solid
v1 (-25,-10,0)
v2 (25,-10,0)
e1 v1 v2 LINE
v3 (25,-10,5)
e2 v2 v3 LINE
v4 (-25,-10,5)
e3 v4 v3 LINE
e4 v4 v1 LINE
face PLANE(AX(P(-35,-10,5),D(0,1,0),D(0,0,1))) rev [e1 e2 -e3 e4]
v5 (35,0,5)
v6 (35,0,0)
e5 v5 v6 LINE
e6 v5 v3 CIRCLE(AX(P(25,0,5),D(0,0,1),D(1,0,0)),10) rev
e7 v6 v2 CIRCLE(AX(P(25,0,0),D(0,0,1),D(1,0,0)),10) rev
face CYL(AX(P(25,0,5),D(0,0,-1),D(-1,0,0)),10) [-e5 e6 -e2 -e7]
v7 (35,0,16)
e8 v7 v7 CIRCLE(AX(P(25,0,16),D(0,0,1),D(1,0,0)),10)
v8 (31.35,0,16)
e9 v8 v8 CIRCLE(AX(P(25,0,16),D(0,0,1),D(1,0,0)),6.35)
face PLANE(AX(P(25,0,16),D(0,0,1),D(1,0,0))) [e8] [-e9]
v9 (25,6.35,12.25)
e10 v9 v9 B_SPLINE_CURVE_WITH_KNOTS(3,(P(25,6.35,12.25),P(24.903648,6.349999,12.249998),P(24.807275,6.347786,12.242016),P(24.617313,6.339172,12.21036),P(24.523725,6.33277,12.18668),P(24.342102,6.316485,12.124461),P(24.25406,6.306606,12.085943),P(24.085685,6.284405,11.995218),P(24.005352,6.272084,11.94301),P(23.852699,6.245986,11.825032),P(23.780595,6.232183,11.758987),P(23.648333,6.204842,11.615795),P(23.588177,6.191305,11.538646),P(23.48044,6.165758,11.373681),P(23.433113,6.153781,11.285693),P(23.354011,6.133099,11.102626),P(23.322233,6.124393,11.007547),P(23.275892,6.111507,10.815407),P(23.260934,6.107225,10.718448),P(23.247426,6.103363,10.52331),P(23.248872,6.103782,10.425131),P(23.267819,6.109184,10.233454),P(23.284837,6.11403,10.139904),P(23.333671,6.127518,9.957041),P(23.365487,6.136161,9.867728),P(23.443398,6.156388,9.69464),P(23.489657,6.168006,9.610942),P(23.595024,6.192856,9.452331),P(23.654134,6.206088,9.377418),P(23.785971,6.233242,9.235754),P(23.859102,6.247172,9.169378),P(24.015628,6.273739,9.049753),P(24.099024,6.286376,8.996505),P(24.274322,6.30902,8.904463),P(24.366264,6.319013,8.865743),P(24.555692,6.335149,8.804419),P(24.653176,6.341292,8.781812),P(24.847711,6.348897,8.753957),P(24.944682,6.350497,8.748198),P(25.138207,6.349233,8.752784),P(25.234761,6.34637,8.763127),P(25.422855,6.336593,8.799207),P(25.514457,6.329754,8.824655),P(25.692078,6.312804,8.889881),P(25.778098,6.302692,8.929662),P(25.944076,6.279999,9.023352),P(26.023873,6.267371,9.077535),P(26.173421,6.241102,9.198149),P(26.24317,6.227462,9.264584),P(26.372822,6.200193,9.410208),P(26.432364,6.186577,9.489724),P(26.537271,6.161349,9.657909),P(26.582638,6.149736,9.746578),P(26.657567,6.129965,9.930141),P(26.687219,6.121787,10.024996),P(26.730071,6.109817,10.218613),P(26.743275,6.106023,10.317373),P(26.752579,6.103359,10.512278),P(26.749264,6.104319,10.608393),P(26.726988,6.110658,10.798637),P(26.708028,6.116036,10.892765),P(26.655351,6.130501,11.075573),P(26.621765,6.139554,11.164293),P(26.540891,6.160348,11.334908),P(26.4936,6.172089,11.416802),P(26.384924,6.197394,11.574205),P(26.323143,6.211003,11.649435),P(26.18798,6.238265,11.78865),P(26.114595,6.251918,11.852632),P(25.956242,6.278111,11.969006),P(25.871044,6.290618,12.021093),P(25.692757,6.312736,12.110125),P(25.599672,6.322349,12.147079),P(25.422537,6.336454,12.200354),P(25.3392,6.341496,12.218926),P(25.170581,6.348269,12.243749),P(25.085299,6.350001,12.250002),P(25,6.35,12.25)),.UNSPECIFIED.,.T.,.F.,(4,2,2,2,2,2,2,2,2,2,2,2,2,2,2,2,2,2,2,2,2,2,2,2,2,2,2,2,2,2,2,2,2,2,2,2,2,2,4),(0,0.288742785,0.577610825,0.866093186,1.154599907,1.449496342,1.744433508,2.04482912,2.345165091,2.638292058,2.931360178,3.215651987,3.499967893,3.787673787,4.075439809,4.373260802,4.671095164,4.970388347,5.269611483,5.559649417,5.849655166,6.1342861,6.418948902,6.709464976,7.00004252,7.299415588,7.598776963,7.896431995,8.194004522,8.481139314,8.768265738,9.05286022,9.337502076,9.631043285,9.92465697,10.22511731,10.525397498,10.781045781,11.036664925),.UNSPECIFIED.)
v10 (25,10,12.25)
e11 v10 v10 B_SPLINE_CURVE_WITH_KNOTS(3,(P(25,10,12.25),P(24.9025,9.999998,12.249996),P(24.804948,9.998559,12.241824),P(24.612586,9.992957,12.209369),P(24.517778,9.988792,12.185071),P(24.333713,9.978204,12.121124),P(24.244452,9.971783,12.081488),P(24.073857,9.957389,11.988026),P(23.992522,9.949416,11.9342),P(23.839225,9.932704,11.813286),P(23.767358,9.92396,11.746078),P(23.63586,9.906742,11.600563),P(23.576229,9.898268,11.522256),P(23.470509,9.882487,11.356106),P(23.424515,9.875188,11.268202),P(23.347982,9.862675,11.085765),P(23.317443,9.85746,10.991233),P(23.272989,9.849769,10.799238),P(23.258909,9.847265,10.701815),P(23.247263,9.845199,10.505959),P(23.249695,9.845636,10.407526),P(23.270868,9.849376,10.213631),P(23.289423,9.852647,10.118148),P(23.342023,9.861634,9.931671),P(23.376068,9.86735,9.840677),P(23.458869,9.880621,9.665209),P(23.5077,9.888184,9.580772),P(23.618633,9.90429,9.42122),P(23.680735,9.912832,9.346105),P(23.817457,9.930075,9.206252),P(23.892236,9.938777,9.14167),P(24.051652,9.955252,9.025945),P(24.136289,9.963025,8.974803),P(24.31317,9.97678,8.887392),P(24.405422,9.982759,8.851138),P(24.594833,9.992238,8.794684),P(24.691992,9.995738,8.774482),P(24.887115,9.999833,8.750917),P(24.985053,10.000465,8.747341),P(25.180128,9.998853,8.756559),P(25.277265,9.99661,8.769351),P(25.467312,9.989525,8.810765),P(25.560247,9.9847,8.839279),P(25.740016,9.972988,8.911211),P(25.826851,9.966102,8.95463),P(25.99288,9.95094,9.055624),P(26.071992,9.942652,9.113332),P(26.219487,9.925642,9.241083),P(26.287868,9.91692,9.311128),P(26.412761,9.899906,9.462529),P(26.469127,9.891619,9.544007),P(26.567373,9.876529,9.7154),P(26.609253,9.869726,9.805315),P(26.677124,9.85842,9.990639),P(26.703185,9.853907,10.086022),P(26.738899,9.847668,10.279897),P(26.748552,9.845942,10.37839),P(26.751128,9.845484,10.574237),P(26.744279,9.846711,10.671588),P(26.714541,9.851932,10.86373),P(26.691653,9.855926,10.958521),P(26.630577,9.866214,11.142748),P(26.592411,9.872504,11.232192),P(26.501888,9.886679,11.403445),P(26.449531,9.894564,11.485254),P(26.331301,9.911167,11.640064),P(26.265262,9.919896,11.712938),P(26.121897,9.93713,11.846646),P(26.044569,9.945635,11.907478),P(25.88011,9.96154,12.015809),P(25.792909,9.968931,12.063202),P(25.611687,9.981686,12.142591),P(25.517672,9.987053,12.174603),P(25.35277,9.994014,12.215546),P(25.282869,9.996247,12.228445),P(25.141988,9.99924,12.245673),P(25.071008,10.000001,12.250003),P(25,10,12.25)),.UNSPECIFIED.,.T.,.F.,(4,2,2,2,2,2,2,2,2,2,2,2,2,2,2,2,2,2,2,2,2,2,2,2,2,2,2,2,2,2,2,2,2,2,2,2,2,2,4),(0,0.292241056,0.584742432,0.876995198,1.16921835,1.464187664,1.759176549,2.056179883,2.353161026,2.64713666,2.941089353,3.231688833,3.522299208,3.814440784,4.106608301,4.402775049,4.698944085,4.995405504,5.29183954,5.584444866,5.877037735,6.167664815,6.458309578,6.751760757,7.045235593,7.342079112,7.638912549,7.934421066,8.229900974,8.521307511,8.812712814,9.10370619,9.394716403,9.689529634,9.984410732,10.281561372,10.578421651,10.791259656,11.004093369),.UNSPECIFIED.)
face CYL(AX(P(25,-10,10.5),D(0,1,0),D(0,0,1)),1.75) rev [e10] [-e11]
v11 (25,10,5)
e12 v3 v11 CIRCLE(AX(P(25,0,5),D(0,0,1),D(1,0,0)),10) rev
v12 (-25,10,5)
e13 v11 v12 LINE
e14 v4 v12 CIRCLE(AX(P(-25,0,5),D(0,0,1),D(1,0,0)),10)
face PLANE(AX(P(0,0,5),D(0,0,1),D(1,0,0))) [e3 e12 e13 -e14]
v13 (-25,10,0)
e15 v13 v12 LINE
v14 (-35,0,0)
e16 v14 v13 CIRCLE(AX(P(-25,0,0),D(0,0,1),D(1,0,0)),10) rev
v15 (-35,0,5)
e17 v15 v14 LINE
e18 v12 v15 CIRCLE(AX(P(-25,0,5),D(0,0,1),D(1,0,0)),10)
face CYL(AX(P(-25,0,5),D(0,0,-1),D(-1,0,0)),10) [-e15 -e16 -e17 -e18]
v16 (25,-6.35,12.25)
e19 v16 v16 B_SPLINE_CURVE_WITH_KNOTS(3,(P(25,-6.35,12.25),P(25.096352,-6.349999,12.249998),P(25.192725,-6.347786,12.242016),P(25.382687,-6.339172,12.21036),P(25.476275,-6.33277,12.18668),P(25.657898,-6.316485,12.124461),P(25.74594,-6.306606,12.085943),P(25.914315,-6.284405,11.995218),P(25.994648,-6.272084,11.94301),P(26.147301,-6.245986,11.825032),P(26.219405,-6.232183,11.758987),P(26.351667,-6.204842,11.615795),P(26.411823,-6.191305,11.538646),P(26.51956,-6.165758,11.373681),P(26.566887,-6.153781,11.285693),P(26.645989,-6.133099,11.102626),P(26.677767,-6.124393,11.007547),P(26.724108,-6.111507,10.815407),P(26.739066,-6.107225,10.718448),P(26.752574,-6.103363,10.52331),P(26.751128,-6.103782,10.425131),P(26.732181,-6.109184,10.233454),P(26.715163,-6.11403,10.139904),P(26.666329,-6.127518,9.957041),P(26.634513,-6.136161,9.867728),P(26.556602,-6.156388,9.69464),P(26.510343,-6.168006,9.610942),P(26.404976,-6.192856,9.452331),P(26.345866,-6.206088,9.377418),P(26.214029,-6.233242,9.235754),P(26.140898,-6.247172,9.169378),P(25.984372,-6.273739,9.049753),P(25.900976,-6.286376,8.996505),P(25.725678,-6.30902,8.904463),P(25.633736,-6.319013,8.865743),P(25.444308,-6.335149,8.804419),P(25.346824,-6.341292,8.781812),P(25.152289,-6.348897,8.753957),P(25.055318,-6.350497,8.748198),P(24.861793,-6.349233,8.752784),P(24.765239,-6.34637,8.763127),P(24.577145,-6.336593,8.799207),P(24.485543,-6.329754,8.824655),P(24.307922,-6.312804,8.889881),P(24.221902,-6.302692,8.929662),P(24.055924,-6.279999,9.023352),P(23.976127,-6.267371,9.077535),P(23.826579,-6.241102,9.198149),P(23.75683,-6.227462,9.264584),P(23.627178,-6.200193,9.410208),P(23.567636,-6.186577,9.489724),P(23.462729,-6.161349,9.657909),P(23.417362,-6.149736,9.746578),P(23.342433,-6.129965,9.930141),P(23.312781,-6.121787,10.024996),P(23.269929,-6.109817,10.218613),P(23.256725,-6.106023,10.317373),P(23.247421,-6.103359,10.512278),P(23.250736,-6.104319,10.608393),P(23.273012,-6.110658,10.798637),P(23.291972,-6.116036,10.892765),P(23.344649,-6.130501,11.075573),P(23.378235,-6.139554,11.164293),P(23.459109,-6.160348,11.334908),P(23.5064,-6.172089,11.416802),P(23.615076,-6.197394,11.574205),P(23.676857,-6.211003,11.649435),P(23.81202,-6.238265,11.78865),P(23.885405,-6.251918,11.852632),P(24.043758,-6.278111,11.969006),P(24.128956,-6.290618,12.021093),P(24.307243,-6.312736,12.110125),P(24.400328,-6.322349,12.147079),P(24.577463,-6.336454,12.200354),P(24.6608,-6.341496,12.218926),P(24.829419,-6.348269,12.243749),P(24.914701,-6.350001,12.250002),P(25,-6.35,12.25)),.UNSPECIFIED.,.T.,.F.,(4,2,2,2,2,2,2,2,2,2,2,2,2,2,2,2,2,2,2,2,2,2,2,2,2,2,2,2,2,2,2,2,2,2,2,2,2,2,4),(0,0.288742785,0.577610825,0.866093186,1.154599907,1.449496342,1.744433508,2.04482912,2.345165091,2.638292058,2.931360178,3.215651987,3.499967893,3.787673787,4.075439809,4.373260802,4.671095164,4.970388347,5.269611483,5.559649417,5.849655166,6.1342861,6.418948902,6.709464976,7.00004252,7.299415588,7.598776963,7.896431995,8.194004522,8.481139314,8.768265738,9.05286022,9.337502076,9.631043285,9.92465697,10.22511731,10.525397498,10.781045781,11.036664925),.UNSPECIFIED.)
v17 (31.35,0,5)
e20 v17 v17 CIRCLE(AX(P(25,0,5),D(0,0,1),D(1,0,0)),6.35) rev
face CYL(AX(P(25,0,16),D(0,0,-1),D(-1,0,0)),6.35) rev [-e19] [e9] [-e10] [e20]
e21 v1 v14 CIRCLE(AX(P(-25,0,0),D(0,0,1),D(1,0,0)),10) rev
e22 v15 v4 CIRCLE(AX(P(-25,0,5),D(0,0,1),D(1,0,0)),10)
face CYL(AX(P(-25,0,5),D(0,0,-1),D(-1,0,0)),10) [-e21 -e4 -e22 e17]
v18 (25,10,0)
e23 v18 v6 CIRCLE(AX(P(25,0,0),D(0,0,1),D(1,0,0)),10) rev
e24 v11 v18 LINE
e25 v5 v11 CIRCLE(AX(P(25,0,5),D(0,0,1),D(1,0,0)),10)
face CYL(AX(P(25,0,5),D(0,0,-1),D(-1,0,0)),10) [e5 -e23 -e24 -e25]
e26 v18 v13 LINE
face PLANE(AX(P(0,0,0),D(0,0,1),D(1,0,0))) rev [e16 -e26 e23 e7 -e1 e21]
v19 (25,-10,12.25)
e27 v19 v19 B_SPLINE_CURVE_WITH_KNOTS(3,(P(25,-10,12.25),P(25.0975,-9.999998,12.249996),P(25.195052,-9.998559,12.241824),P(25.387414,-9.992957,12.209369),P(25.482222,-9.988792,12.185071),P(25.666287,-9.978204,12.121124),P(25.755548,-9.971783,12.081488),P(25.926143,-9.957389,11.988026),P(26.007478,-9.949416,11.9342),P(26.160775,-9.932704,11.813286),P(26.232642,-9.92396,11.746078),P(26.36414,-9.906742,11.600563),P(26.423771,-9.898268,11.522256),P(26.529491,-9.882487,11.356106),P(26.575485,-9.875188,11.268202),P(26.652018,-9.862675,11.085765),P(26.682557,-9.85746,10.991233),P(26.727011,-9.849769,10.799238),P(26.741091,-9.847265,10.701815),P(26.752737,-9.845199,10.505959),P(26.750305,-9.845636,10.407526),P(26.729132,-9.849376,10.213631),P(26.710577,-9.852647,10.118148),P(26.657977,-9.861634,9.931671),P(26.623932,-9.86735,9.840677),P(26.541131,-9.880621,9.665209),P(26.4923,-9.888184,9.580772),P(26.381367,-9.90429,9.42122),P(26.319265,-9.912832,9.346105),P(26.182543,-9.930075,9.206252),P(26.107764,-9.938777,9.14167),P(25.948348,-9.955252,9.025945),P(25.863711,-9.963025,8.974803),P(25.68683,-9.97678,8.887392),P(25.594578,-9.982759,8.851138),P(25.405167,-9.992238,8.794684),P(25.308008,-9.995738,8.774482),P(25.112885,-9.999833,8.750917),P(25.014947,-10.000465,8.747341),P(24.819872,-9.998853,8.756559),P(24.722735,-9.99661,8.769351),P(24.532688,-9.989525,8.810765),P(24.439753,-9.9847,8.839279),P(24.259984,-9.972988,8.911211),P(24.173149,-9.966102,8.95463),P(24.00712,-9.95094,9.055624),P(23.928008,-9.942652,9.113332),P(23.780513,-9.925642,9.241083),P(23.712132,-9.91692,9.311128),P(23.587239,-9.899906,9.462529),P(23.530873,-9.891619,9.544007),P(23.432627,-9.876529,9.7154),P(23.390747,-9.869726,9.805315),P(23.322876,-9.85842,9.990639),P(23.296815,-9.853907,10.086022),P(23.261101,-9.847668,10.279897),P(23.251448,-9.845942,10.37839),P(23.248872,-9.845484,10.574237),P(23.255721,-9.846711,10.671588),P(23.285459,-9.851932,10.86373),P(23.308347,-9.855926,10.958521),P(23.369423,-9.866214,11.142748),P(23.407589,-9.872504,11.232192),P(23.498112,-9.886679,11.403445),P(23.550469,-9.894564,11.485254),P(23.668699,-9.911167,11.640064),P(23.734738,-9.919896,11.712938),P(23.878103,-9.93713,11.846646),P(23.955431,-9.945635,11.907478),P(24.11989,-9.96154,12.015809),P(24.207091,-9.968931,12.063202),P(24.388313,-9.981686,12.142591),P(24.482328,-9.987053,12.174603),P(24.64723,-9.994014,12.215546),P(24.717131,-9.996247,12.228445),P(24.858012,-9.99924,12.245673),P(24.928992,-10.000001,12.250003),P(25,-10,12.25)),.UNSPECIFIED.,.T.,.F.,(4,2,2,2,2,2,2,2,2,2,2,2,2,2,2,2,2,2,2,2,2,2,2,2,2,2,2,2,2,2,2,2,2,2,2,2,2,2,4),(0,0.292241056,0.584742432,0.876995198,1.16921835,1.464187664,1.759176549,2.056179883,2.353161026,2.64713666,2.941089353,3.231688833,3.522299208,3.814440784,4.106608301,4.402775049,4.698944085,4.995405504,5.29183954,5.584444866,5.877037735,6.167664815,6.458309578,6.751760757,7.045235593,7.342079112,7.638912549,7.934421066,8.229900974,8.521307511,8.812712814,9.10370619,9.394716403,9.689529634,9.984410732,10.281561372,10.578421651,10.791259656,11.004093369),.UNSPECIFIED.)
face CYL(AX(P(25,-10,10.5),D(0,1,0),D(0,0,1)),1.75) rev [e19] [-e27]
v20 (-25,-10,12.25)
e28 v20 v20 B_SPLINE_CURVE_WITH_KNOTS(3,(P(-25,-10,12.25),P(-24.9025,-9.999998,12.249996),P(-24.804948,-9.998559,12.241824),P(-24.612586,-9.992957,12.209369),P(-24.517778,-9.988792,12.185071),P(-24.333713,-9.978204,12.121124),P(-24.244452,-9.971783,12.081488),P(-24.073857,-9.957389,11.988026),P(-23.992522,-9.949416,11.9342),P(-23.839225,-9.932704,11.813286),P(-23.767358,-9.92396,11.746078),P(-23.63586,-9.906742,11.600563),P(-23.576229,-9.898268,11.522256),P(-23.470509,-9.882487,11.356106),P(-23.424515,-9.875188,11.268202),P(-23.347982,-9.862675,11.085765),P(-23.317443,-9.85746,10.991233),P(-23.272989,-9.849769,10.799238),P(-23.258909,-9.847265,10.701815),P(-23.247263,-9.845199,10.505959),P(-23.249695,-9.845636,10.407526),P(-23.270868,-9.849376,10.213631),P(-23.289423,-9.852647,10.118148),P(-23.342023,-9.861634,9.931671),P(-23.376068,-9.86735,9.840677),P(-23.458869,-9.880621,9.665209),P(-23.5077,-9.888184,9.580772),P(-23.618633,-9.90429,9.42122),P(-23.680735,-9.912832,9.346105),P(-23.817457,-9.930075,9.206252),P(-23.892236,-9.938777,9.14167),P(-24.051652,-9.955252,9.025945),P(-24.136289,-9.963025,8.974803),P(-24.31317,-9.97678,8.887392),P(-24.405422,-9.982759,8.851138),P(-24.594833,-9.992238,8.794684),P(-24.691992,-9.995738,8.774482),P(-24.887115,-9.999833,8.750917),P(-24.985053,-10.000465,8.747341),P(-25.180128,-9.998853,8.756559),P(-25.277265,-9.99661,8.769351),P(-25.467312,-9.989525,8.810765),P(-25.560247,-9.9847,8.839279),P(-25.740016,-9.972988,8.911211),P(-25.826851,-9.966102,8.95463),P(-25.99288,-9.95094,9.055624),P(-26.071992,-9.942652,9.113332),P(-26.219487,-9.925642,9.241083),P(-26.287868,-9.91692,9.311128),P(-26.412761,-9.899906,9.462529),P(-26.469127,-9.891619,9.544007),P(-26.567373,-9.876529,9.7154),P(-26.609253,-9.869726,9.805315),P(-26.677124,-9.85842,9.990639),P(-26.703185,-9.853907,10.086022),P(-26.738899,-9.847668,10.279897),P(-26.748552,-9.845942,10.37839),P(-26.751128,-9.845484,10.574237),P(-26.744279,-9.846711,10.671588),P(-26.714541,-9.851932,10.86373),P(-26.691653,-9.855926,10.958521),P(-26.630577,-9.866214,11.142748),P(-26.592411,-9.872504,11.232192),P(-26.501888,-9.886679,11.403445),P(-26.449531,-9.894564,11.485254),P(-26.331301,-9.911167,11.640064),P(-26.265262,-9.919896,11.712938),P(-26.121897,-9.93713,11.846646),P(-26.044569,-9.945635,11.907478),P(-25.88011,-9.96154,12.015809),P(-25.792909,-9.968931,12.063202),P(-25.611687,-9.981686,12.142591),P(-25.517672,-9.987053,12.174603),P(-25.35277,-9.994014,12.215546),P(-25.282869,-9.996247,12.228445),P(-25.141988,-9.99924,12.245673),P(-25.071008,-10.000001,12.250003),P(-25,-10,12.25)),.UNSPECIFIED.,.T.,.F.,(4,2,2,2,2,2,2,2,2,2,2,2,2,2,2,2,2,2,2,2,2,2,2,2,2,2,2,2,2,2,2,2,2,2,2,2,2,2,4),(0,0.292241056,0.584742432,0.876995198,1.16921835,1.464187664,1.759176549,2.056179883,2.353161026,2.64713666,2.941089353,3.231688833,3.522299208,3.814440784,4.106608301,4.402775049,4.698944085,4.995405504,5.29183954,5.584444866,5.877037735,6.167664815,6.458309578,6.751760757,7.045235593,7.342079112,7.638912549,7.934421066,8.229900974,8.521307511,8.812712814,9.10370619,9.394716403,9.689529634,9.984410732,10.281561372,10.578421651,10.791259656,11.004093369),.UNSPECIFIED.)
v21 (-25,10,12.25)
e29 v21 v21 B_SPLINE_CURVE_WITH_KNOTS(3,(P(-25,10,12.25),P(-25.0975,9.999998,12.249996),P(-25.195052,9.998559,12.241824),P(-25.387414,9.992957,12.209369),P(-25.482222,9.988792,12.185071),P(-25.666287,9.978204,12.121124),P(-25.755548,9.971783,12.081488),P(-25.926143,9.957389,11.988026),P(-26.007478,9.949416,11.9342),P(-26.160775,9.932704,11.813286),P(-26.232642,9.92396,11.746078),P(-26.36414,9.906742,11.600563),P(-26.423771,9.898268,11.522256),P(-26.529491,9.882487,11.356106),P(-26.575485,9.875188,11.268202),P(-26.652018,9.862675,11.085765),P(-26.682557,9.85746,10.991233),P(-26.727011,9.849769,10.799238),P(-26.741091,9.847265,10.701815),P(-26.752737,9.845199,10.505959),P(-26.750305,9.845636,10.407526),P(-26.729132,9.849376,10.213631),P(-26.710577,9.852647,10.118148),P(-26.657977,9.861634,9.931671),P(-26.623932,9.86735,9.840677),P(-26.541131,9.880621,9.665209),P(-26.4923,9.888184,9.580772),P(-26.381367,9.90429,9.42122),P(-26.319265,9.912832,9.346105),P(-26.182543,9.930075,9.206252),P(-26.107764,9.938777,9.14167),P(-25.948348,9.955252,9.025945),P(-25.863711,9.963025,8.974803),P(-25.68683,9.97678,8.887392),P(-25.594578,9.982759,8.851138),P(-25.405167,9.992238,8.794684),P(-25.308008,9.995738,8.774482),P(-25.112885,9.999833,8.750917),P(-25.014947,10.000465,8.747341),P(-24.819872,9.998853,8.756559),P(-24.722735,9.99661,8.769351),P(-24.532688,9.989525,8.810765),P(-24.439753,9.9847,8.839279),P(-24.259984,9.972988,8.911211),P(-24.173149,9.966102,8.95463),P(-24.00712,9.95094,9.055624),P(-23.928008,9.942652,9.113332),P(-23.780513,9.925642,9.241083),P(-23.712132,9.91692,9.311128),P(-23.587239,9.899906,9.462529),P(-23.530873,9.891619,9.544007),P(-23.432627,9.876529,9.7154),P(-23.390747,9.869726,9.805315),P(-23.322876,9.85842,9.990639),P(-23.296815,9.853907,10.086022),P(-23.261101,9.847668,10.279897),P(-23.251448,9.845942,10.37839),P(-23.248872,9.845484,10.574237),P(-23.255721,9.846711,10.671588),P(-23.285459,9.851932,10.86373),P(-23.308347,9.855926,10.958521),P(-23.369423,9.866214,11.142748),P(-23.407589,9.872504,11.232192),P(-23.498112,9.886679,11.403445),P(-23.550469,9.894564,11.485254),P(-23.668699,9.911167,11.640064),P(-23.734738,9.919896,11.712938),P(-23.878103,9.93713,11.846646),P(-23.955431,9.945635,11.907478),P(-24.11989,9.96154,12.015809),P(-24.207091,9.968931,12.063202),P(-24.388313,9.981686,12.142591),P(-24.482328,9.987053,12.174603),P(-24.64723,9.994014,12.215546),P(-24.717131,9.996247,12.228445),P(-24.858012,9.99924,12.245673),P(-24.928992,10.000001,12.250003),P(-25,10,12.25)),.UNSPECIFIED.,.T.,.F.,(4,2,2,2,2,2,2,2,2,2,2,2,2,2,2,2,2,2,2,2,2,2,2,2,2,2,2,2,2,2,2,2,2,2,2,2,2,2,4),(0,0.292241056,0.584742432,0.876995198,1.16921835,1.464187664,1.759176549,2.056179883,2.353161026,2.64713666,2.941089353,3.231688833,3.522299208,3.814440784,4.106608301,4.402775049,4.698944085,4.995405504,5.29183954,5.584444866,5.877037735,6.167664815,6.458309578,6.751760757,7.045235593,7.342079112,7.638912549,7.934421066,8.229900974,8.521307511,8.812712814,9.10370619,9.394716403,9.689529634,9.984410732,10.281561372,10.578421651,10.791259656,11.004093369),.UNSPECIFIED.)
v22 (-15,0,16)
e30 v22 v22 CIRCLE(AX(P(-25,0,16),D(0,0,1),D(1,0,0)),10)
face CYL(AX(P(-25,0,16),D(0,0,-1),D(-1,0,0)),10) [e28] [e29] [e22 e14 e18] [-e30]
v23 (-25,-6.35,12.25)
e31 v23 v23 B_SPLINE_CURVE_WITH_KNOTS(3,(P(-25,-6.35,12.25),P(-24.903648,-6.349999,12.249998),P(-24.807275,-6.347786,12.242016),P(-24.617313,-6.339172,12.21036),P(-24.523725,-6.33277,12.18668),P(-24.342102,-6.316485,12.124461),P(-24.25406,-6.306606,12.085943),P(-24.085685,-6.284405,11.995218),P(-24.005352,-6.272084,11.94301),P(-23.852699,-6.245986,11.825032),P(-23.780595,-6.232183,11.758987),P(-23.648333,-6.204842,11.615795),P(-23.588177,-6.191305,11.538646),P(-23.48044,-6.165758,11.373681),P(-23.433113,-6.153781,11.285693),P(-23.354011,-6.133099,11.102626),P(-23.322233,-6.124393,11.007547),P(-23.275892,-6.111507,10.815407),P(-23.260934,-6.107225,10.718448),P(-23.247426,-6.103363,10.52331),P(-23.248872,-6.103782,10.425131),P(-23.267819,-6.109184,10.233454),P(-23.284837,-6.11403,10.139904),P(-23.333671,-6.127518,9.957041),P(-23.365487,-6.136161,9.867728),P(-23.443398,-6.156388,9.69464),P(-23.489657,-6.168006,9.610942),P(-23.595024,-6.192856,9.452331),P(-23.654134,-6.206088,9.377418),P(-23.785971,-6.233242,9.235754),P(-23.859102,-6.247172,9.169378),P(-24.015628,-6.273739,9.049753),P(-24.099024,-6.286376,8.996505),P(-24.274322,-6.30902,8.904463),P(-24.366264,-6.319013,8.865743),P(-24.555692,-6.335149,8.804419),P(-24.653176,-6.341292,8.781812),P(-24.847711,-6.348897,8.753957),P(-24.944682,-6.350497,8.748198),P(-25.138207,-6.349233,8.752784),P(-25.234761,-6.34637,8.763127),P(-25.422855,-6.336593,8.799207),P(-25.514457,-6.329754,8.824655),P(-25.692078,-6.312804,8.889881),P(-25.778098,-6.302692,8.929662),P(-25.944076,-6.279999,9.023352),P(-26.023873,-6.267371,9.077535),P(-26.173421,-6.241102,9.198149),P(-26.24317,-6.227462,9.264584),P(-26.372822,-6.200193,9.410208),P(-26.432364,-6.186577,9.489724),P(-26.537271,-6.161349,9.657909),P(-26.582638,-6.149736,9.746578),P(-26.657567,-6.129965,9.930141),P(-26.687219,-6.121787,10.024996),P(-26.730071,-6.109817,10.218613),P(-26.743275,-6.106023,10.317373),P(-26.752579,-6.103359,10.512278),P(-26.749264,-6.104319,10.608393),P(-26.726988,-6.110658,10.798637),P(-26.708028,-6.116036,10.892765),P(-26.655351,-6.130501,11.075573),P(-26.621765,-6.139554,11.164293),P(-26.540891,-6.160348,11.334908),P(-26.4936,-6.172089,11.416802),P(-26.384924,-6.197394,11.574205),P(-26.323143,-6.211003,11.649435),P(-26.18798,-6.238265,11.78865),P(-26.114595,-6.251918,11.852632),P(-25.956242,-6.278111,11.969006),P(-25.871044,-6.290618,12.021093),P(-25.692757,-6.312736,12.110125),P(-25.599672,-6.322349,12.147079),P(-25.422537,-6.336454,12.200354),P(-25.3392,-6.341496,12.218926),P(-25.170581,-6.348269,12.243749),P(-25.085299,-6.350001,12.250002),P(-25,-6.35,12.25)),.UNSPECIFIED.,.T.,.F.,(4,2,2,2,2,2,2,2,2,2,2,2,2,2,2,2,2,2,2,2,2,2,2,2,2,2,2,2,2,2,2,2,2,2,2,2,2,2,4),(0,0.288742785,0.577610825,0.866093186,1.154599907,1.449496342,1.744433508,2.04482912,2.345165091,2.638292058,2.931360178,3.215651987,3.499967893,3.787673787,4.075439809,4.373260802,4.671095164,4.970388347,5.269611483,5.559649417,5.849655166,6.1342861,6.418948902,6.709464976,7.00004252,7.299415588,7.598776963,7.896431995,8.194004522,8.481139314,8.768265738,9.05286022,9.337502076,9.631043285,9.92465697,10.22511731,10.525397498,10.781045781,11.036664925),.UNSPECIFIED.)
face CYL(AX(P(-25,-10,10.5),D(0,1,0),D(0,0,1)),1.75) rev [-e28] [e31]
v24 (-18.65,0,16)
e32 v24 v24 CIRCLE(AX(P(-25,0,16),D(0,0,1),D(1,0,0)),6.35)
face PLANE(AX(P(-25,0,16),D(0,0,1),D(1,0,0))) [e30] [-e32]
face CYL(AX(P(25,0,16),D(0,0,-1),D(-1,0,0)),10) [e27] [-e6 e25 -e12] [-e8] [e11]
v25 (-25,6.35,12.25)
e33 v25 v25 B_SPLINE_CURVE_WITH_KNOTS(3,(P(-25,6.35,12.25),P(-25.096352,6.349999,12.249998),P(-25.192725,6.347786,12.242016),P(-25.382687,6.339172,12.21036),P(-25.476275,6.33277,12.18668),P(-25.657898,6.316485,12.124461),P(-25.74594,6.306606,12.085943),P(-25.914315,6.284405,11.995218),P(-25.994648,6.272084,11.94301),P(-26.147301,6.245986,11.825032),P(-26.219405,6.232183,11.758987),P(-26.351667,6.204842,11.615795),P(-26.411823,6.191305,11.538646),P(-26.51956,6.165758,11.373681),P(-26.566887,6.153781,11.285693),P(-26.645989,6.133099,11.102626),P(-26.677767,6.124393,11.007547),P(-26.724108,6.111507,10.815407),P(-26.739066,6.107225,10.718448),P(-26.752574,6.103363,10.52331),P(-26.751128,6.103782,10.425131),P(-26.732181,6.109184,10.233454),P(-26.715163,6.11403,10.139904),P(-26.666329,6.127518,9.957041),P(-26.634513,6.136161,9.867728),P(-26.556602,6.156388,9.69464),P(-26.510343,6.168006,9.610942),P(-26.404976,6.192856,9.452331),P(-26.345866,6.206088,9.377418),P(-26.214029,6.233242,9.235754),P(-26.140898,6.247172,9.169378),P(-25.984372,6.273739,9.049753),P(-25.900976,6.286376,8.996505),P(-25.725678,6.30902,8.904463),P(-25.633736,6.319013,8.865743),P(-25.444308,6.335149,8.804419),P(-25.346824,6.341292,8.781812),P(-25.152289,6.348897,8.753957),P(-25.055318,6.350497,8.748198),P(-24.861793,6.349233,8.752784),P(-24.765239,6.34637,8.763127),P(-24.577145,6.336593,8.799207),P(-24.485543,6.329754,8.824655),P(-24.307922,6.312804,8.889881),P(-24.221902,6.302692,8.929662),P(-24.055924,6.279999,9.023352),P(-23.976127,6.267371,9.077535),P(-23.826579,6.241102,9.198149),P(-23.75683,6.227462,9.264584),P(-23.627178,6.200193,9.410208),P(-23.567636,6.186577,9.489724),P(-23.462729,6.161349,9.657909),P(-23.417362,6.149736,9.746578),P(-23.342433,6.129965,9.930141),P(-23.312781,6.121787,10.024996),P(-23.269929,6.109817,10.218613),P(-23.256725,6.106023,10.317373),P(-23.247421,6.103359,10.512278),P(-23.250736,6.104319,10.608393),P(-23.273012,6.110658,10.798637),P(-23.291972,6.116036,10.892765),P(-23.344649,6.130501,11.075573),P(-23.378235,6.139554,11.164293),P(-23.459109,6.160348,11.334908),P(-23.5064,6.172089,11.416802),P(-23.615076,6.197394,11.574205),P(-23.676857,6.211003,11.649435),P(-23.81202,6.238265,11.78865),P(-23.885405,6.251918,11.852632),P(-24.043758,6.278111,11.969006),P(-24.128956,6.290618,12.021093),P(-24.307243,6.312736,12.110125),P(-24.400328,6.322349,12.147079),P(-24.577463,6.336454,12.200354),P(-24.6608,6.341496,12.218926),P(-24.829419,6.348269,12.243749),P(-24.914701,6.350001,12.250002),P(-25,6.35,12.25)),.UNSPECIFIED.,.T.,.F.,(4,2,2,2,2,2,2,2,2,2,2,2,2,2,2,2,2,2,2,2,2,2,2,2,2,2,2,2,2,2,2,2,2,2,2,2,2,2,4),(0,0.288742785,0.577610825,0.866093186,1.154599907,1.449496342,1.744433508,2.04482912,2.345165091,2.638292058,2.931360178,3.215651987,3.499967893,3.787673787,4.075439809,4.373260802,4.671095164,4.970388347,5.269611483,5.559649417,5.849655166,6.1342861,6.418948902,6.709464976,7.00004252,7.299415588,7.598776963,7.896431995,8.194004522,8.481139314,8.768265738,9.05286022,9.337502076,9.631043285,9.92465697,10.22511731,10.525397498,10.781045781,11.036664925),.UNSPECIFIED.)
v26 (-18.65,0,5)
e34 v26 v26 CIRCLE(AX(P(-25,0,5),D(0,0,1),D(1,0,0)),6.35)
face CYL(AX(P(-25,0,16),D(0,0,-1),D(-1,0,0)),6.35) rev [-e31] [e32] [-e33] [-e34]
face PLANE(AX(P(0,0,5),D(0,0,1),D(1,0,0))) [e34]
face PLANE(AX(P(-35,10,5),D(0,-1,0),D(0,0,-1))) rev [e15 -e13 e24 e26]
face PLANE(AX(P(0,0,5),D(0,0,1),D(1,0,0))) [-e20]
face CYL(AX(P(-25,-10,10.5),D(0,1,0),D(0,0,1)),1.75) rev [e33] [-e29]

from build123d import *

# Parameters (mm, degrees)
SKETCH1_W           = 70
SKETCH1_H           = 20
BOSS_EXTRUDE1_DEPTH = 5
SKETCH2_R           = 10
SKETCH2_R_2         = 6.35
BOSS_EXTRUDE2_DEPTH = 11
SKETCH3_R           = 1.75
CUT_EXTRUDE1_DEPTH  = 44.370496884
FILLET1_R           = 10


with BuildPart() as part:
    # Sketch1 → Boss-Extrude1 (new body)
    with BuildSketch(Plane.XY):
        Rectangle(SKETCH1_W, SKETCH1_H)
    extrude(amount=BOSS_EXTRUDE1_DEPTH)

    # Sketch2 → Boss-Extrude2 (add)
    # profile 1 of 2: a face of its own
    with BuildSketch(Plane.XY.offset(5)):
        with Locations(Location((-25, 0, 0), (0, 0, 180))):
            Circle(SKETCH2_R)
        with Locations((-25, 0)):
            Circle(SKETCH2_R_2, mode=Mode.SUBTRACT)
    # profile 2 of 2: a face of its own
    with BuildSketch(Plane.XY.offset(5)):
        with Locations((25, 0)):
            Circle(SKETCH2_R)
        with Locations((25, 0)):
            Circle(SKETCH2_R_2, mode=Mode.SUBTRACT)
    extrude(amount=BOSS_EXTRUDE2_DEPTH)

    # Sketch3 → Cut-Extrude1 (cut, through all)
    with BuildSketch(Plane(origin=(0, 10, 0), x_dir=(1, 0, 0), z_dir=(0, 1, 0))):
        with Locations(Location((-25, -10.5, 0), (0, 0, 270))):
            Circle(SKETCH3_R)
        with Locations(Location((25, -10.5, 0), (0, 0, 270))):
            Circle(SKETCH3_R)
    extrude(amount=-CUT_EXTRUDE1_DEPTH, mode=Mode.SUBTRACT)

    # Fillet1
    fillet1_edges = [part.edges().sort_by_distance(p)[0] for p in [
        (-35, -10, 2.5),
        (-35, 10, 2.5),
        (35, 10, 2.5),
        (35, -10, 2.5),
    ]]
    fillet(fillet1_edges, radius=FILLET1_R - 0.0001)  # a hair under: the kernel refuses the full size


solid = part.part
